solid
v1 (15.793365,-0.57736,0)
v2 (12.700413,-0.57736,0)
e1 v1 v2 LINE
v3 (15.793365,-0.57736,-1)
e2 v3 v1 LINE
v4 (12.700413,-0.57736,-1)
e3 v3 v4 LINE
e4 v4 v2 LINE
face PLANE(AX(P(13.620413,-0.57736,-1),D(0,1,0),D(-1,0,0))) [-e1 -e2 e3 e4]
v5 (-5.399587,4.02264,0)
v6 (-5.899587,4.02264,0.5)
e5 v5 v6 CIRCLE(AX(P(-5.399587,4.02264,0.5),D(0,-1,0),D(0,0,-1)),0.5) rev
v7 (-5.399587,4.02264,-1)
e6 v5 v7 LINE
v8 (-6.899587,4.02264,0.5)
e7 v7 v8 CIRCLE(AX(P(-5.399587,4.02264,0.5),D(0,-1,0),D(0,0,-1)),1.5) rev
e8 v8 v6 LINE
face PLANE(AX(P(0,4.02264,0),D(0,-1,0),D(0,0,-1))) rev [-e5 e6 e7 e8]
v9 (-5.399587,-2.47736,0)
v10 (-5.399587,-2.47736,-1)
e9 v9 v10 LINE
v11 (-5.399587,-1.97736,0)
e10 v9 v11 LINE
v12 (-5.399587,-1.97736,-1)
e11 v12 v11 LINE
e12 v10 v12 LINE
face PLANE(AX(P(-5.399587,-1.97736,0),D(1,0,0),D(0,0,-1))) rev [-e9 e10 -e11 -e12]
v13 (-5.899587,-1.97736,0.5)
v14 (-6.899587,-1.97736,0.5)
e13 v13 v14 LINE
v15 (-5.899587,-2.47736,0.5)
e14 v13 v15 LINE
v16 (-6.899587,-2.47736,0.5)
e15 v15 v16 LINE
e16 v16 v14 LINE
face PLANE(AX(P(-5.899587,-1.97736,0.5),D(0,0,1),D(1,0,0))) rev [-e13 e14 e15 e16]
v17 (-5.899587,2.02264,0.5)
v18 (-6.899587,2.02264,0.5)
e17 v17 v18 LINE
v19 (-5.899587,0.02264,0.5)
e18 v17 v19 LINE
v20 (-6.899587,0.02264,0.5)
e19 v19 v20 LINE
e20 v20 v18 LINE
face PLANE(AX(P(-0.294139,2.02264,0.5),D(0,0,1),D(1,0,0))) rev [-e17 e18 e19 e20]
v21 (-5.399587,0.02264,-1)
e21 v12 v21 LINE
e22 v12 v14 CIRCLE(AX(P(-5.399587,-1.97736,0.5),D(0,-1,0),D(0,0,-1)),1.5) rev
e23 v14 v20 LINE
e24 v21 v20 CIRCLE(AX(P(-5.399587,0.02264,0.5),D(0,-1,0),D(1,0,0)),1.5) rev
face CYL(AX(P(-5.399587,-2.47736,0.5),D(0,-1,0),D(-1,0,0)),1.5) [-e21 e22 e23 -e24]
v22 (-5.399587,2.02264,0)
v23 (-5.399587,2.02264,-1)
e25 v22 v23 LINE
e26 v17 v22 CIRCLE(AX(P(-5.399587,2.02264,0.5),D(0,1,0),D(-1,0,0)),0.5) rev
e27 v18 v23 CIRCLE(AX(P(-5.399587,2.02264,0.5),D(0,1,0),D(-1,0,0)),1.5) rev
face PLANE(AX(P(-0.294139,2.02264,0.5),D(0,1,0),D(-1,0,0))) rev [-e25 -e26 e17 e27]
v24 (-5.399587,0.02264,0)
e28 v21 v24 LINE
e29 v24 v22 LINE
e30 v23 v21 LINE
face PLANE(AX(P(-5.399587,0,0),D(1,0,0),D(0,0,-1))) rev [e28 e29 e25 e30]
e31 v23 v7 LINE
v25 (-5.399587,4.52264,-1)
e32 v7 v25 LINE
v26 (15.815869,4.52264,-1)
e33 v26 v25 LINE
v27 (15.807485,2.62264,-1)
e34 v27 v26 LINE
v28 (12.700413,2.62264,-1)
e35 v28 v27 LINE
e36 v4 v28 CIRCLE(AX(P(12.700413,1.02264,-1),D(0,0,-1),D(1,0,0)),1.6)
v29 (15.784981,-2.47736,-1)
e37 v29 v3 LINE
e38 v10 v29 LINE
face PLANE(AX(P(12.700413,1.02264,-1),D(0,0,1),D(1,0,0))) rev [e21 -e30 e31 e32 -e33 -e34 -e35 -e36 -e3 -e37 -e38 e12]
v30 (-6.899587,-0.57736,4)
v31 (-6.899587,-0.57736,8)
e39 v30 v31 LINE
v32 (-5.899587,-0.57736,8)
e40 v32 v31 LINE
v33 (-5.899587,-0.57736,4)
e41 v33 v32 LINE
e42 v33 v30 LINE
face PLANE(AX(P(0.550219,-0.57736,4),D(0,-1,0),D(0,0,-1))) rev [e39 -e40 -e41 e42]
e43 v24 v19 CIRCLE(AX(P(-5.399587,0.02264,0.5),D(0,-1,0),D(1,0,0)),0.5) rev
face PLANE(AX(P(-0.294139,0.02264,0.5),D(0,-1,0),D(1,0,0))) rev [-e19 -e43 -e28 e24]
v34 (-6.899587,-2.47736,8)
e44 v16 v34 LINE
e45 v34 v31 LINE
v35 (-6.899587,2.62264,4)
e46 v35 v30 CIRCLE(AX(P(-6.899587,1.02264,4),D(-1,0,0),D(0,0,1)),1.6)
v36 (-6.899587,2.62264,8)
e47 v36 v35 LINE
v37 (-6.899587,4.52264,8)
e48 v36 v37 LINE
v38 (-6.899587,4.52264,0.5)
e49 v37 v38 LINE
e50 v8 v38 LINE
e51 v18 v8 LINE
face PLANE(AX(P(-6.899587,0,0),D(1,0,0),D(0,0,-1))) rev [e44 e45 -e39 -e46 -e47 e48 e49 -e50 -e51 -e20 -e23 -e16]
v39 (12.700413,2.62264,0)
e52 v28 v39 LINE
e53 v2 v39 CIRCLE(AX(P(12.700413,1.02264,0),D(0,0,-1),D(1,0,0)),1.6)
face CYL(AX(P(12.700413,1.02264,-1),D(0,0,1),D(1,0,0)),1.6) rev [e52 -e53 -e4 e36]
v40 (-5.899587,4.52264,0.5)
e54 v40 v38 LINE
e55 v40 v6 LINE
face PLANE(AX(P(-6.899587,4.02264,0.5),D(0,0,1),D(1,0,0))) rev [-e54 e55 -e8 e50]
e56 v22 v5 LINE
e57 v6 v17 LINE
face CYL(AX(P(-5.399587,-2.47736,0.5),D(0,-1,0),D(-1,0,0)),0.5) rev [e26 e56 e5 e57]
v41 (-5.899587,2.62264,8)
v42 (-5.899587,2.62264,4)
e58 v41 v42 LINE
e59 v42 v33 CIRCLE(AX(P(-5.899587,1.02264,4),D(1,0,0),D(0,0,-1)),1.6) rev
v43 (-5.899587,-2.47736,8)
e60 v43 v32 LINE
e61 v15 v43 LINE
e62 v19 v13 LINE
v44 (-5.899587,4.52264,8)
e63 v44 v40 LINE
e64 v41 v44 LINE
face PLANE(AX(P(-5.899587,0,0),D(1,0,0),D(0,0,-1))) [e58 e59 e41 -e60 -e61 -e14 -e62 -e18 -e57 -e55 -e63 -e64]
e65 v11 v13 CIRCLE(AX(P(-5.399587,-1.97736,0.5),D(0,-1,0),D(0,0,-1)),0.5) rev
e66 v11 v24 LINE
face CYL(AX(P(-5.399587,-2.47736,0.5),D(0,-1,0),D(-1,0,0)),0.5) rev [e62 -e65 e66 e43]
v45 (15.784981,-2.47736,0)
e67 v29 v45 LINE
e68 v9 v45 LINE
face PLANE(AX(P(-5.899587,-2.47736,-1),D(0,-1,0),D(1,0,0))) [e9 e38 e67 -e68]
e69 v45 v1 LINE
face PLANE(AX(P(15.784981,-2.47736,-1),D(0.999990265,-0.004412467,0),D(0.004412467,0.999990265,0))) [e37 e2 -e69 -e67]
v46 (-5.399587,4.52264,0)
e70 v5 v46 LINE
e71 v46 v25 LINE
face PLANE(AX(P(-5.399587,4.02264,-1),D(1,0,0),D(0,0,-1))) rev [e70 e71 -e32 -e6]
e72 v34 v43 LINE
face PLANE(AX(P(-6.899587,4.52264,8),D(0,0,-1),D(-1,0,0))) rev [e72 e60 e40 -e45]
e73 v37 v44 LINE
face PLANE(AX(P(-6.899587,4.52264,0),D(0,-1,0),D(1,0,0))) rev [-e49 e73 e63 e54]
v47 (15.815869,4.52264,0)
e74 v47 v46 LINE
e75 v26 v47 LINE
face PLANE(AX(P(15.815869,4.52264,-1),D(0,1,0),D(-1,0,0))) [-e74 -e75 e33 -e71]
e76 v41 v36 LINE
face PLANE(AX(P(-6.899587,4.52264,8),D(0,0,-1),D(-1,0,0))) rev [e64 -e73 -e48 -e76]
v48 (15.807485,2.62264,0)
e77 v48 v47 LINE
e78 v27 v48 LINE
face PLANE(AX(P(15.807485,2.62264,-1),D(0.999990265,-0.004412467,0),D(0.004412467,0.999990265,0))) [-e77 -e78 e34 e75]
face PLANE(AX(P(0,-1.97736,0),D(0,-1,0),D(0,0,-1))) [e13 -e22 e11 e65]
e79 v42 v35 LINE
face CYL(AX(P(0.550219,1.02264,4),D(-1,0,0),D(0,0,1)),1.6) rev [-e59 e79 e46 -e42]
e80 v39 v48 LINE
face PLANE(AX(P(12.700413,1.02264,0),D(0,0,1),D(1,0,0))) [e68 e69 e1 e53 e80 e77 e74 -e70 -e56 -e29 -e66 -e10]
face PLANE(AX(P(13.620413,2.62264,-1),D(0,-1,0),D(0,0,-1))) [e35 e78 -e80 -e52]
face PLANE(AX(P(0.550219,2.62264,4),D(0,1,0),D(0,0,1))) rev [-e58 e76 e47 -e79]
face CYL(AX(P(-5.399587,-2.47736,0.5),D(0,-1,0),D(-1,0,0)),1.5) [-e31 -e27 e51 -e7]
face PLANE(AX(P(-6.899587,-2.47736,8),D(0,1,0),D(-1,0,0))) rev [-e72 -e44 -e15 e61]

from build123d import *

# Parameters (mm, degrees)
ODGI_CIE_BAZOWE1_DEPTH             = 1
ODGI_CIE_KRAW_DZI1_STRIP_W         = 5
ODGI_CIE_KRAW_DZI1_STRIP_H         = 1
ODGI_CIE_KRAW_DZI1_STRIP_CUT_DEPTH = 7
ODGI_CIE_KRAW_DZI1_DEPTH           = 7
WYTNIJ_WYCI_GNI_CIE1_DEPTH         = 1
WYTNIJ_WYCI_GNI_CIE2_START         = -1.5
SZKIC8_W                           = 4.697403352
SZKIC8_H                           = 2
WYTNIJ_WYCI_GNI_CIE2_DEPTH         = 1.5
WYTNIJ_WYCI_GNI_CIE5_DEPTH         = 0.5
SZKIC7_W                           = 1.5
SZKIC7_H                           = 1.5
WYTNIJ_WYCI_GNI_CIE6_DEPTH         = 0.5


# Sheet-metal steps are written as plain solids
with BuildPart() as part:
    # Szkic1 → Odgięcie bazowe1 (new body)
    with BuildSketch(Plane.XY):
        with BuildLine():
            Line((-5.899587166, 4.522640333), (-5.899587166, -2.477359667))
            Line((-5.899587166, -2.477359667), (15.784981022, -2.477359667))
            Line((15.784981022, -2.477359667), (15.793364792, -0.577359667))
            Line((15.793364792, -0.577359667), (13.620412834, -0.577359667))
            Line((13.620412834, -0.577359667), (12.700412834, -0.577359667))
            ThreePointArc((12.700412834, -0.577359667), (11.100412834, 1.022640333), (12.700412834, 2.622640333))
            Line((12.700412834, 2.622640333), (13.620412834, 2.622640333))
            Line((13.620412834, 2.622640333), (15.807484825, 2.622640333))
            Line((15.807484825, 2.622640333), (15.815868595, 4.522640333))
            Line((15.815868595, 4.522640333), (-5.899587166, 4.522640333))
        make_face()
    extrude(amount=-ODGI_CIE_BAZOWE1_DEPTH)

    # Odgięcie krawędzi1 strip (across the edge) → Odgięcie krawędzi1 strip cut (cut)
    with BuildSketch(Plane(origin=(-5.899587166, 4.522640333, 0), x_dir=(1, 0, 0), z_dir=(0, -1, 0))):
        with Locations((-2, -0.5)):
            Rectangle(ODGI_CIE_KRAW_DZI1_STRIP_W, ODGI_CIE_KRAW_DZI1_STRIP_H)
    extrude(amount=ODGI_CIE_KRAW_DZI1_STRIP_CUT_DEPTH, mode=Mode.SUBTRACT)

    # Odgięcie krawędzi1 section (across the edge) → Odgięcie krawędzi1 (add)
    with BuildSketch(Plane(origin=(-5.899587166, 4.522640333, 0), x_dir=(1, 0, 0), z_dir=(0, -1, 0))):
        with BuildLine():
            Line((-1, 0.5), (-1, 8))
            Line((-1, 8), (0, 8))
            Line((0, 8), (0, 0.5))
            ThreePointArc((0, 0.5), (0.146446609, 0.146446609), (0.5, 0))
            Line((0.5, 0), (0.5, -1))
            ThreePointArc((0.5, -1), (-0.560660172, -0.560660172), (-1, 0.5))
        make_face()
    extrude(amount=ODGI_CIE_KRAW_DZI1_DEPTH)

    # Szkic5 → Wytnij-wyciągnięcie1 (cut)
    with BuildSketch(Plane.ZY.offset(6.899587166)):
        with BuildLine():
            Line((4, -0.577359667), (8, -0.577359667))
            Line((8, -0.577359667), (8, 2.622640333))
            Line((8, 2.622640333), (4, 2.622640333))
            ThreePointArc((4, 2.622640333), (2.4, 1.022640333), (4, -0.577359667))
        make_face()
    extrude(amount=-WYTNIJ_WYCI_GNI_CIE1_DEPTH, mode=Mode.SUBTRACT)

    # Szkic8 → Wytnij-wyciągnięcie2 (cut)
    with BuildSketch(Plane.ZY.offset(6.899587166).offset(WYTNIJ_WYCI_GNI_CIE2_START)):
        with Locations((-1.848701676, 1.022640333)):
            Rectangle(SZKIC8_W, SZKIC8_H)
    extrude(amount=WYTNIJ_WYCI_GNI_CIE2_DEPTH, mode=Mode.SUBTRACT)

    # Szkic6 → Wytnij-wyciągnięcie5 (cut)
    with BuildSketch(Plane.XZ.offset(2.477359667)):
        Polygon((-5.899587166, 0.5), (-5.399587166, 0), (-5.399587166, -1), (-6.899587166, -1), (-6.899587166, 0.5), align=None)
    extrude(amount=-WYTNIJ_WYCI_GNI_CIE5_DEPTH, mode=Mode.SUBTRACT)

    # Szkic7 → Wytnij-wyciągnięcie6 (cut)
    with BuildSketch(Plane(origin=(0, 4.522640333, 0), x_dir=(1, 0, 0), z_dir=(0, 1, 0))):
        with Locations((-6.149587166, 0.25)):
            Rectangle(SZKIC7_W, SZKIC7_H)
    extrude(amount=-WYTNIJ_WYCI_GNI_CIE6_DEPTH, mode=Mode.SUBTRACT)


solid = part.part
